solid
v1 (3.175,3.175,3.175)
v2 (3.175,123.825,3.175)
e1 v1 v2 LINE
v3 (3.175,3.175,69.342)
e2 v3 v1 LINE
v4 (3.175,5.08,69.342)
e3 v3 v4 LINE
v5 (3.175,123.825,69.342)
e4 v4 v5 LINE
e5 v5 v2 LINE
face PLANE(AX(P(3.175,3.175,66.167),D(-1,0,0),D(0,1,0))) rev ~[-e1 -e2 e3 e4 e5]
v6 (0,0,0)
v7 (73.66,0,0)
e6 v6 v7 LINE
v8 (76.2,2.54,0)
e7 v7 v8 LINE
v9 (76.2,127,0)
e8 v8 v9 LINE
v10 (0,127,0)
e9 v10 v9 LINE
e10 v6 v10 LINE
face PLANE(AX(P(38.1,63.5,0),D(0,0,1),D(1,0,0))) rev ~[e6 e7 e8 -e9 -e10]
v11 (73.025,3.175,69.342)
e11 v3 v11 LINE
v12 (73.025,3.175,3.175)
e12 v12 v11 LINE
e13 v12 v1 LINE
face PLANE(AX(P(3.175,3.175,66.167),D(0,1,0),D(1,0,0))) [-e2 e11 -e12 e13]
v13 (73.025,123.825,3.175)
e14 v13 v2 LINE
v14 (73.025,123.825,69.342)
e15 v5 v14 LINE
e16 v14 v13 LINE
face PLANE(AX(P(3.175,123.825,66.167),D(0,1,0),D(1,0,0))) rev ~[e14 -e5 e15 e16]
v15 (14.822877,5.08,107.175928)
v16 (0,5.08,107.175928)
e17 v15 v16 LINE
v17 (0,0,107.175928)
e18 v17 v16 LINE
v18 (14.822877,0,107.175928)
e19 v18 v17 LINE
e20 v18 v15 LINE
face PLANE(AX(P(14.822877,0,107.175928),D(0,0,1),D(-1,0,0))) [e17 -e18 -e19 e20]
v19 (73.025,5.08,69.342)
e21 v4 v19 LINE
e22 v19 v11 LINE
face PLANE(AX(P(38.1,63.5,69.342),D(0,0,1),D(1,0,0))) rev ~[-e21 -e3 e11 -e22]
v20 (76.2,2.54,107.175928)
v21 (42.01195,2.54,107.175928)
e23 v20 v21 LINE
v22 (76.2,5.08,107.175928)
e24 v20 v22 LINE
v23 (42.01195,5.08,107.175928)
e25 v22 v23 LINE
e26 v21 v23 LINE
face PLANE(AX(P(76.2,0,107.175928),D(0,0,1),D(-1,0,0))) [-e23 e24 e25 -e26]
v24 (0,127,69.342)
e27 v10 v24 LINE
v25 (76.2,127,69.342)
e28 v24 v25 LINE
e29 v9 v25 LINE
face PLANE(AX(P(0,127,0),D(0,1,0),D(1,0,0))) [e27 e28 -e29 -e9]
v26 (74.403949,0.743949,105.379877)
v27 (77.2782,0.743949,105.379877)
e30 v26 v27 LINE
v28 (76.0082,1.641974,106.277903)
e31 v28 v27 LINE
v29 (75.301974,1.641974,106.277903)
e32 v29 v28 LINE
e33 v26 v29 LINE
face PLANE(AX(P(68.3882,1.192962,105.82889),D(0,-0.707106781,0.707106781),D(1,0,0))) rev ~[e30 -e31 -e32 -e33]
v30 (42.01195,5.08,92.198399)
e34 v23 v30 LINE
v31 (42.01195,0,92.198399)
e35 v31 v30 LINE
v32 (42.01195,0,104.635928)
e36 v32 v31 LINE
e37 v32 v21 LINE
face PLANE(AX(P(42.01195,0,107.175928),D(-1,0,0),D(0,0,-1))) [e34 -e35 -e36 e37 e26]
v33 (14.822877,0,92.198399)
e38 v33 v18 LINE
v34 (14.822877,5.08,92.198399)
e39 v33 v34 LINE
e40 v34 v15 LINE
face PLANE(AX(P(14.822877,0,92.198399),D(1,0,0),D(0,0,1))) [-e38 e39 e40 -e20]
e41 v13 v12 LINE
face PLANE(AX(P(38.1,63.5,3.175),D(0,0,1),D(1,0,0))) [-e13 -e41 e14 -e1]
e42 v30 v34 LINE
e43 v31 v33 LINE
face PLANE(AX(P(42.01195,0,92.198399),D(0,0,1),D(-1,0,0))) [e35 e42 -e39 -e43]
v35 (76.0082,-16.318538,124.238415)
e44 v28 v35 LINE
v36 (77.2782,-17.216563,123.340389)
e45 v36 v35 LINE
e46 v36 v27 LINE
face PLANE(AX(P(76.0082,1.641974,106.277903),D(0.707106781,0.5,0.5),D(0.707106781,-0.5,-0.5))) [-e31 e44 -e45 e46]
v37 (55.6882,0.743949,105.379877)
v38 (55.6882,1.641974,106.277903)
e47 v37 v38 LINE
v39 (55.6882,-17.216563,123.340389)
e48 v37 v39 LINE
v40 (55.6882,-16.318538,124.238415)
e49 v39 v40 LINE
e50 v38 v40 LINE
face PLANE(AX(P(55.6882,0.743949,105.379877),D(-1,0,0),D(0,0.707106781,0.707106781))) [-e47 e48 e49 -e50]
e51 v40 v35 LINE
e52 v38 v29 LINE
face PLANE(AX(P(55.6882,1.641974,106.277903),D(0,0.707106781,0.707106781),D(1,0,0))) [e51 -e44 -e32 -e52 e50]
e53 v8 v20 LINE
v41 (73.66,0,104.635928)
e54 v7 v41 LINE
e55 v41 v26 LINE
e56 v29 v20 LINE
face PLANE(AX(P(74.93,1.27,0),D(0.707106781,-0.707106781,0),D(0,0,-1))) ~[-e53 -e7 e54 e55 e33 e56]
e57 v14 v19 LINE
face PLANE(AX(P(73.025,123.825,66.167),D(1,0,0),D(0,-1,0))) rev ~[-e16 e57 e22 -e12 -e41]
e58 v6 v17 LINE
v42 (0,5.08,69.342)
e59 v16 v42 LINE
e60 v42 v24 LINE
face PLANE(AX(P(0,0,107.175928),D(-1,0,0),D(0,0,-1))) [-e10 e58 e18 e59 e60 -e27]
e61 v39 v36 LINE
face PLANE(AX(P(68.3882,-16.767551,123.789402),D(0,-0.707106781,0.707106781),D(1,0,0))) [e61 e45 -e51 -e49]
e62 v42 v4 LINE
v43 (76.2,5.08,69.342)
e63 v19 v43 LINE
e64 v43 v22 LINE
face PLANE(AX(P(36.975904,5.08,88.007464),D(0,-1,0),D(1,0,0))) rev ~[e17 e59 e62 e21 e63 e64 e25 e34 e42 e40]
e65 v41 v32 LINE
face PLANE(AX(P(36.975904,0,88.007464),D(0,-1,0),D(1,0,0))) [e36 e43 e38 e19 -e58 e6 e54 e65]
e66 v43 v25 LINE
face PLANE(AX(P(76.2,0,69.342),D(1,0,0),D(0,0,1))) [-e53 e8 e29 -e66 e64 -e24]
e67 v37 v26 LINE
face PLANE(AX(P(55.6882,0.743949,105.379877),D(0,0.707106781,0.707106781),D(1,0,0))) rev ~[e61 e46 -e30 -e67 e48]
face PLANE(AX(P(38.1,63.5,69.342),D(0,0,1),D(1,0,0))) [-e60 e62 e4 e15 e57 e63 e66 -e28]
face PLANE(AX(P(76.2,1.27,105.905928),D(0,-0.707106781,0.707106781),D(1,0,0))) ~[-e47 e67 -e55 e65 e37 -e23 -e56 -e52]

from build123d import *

# Parameters (mm, degrees)
F0_W         = 76.2
F0_H         = 127
F1_DEPTH     = 69.342
F3_DEPTH     = 5.08
F4_T         = -3.175
F7_SIZE      = 2.54
F8_W         = 25.4
F8_H         = 1.27
F9_DEPTH     = 25.4
F10_T1_DEPTH = 38.4641495789


# Not quite as in the source:
# - a fillet or chamfer that OpenCascade refuses, or shapes differently, is made with other operations: its cross-section is extruded or revolved along the edge and cut away or added
# - a feature of the source that left no trace in its solid (it failed there, or was rolled back) is left out


with BuildPart() as f1:
    # F0 (on Top) → F1 (new body)
    with BuildSketch(Plane.XY):
        with Locations((38.1, 63.5)):
            Rectangle(F0_W, F0_H)
    extrude(amount=F1_DEPTH)

    # F2 (on face) → F3 (join)
    with BuildSketch(Plane.XZ):
        Polygon((0, 107.1759281516), (0, 69.342), (76.2, 69.342), (76.2, 107.1759281516), (42.011950165, 107.1759281516), (42.011950165, 92.1983985066), (14.8228770122, 92.1983985066), (14.8228770122, 107.1759281516), align=None)
    extrude(amount=-F3_DEPTH)

    # F4: a shell. OpenCascade refuses it in one call, so the cavity is built on its own and cut out:
    # the body offset inwards by the wall thickness, plus a prism from it out through each open face.
    f4_core = offset(f1.part, amount=F4_T, kind=Kind.INTERSECTION, mode=Mode.PRIVATE)
    f4_exits = [f4_core.faces().sort_by_distance(p)[0] for p in [
        (38.1, 63.5, 66.167),
    ]]
    add(f4_core, mode=Mode.SUBTRACT)
    extrude(f4_exits, amount=-F4_T, mode=Mode.SUBTRACT)

    # F7
    f7_edges = [f1.edges().sort_by_distance(p)[0] for p in [
        (59.105975, 0, 107.175928),
        (76.2, 0, 53.587964),
    ]]
    chamfer(f7_edges, length=F7_SIZE)

    # F8 (on face) → F9 (join)
    with BuildSketch(Plane(origin=(0, -52.3179640758, 52.3179640758), x_dir=(1, 0, 0), z_dir=(0, -0.7071067812, 0.7071067812))):
        with Locations((68.3882001948, 75.6758768002)):
            Rectangle(F8_W, F8_H)
    extrude(amount=F9_DEPTH)

    # F10: chamfer of 5.08 on 1 edges, made by hand

    # F10_s2 → F10_t1 (cut)
    with BuildSketch(Plane(origin=(0, -52.3179640758, 52.3179640758), x_dir=(1, 0, 0), z_dir=(0, -0.7071067812, 0.7071067812))):
        Polygon((76.0082001948, 76.3108768002), (81.0882001948, 71.2308768002), (81.0882001948, 76.3108768002), align=None)
    extrude(amount=F10_T1_DEPTH, mode=Mode.SUBTRACT)


solid = f1.part
